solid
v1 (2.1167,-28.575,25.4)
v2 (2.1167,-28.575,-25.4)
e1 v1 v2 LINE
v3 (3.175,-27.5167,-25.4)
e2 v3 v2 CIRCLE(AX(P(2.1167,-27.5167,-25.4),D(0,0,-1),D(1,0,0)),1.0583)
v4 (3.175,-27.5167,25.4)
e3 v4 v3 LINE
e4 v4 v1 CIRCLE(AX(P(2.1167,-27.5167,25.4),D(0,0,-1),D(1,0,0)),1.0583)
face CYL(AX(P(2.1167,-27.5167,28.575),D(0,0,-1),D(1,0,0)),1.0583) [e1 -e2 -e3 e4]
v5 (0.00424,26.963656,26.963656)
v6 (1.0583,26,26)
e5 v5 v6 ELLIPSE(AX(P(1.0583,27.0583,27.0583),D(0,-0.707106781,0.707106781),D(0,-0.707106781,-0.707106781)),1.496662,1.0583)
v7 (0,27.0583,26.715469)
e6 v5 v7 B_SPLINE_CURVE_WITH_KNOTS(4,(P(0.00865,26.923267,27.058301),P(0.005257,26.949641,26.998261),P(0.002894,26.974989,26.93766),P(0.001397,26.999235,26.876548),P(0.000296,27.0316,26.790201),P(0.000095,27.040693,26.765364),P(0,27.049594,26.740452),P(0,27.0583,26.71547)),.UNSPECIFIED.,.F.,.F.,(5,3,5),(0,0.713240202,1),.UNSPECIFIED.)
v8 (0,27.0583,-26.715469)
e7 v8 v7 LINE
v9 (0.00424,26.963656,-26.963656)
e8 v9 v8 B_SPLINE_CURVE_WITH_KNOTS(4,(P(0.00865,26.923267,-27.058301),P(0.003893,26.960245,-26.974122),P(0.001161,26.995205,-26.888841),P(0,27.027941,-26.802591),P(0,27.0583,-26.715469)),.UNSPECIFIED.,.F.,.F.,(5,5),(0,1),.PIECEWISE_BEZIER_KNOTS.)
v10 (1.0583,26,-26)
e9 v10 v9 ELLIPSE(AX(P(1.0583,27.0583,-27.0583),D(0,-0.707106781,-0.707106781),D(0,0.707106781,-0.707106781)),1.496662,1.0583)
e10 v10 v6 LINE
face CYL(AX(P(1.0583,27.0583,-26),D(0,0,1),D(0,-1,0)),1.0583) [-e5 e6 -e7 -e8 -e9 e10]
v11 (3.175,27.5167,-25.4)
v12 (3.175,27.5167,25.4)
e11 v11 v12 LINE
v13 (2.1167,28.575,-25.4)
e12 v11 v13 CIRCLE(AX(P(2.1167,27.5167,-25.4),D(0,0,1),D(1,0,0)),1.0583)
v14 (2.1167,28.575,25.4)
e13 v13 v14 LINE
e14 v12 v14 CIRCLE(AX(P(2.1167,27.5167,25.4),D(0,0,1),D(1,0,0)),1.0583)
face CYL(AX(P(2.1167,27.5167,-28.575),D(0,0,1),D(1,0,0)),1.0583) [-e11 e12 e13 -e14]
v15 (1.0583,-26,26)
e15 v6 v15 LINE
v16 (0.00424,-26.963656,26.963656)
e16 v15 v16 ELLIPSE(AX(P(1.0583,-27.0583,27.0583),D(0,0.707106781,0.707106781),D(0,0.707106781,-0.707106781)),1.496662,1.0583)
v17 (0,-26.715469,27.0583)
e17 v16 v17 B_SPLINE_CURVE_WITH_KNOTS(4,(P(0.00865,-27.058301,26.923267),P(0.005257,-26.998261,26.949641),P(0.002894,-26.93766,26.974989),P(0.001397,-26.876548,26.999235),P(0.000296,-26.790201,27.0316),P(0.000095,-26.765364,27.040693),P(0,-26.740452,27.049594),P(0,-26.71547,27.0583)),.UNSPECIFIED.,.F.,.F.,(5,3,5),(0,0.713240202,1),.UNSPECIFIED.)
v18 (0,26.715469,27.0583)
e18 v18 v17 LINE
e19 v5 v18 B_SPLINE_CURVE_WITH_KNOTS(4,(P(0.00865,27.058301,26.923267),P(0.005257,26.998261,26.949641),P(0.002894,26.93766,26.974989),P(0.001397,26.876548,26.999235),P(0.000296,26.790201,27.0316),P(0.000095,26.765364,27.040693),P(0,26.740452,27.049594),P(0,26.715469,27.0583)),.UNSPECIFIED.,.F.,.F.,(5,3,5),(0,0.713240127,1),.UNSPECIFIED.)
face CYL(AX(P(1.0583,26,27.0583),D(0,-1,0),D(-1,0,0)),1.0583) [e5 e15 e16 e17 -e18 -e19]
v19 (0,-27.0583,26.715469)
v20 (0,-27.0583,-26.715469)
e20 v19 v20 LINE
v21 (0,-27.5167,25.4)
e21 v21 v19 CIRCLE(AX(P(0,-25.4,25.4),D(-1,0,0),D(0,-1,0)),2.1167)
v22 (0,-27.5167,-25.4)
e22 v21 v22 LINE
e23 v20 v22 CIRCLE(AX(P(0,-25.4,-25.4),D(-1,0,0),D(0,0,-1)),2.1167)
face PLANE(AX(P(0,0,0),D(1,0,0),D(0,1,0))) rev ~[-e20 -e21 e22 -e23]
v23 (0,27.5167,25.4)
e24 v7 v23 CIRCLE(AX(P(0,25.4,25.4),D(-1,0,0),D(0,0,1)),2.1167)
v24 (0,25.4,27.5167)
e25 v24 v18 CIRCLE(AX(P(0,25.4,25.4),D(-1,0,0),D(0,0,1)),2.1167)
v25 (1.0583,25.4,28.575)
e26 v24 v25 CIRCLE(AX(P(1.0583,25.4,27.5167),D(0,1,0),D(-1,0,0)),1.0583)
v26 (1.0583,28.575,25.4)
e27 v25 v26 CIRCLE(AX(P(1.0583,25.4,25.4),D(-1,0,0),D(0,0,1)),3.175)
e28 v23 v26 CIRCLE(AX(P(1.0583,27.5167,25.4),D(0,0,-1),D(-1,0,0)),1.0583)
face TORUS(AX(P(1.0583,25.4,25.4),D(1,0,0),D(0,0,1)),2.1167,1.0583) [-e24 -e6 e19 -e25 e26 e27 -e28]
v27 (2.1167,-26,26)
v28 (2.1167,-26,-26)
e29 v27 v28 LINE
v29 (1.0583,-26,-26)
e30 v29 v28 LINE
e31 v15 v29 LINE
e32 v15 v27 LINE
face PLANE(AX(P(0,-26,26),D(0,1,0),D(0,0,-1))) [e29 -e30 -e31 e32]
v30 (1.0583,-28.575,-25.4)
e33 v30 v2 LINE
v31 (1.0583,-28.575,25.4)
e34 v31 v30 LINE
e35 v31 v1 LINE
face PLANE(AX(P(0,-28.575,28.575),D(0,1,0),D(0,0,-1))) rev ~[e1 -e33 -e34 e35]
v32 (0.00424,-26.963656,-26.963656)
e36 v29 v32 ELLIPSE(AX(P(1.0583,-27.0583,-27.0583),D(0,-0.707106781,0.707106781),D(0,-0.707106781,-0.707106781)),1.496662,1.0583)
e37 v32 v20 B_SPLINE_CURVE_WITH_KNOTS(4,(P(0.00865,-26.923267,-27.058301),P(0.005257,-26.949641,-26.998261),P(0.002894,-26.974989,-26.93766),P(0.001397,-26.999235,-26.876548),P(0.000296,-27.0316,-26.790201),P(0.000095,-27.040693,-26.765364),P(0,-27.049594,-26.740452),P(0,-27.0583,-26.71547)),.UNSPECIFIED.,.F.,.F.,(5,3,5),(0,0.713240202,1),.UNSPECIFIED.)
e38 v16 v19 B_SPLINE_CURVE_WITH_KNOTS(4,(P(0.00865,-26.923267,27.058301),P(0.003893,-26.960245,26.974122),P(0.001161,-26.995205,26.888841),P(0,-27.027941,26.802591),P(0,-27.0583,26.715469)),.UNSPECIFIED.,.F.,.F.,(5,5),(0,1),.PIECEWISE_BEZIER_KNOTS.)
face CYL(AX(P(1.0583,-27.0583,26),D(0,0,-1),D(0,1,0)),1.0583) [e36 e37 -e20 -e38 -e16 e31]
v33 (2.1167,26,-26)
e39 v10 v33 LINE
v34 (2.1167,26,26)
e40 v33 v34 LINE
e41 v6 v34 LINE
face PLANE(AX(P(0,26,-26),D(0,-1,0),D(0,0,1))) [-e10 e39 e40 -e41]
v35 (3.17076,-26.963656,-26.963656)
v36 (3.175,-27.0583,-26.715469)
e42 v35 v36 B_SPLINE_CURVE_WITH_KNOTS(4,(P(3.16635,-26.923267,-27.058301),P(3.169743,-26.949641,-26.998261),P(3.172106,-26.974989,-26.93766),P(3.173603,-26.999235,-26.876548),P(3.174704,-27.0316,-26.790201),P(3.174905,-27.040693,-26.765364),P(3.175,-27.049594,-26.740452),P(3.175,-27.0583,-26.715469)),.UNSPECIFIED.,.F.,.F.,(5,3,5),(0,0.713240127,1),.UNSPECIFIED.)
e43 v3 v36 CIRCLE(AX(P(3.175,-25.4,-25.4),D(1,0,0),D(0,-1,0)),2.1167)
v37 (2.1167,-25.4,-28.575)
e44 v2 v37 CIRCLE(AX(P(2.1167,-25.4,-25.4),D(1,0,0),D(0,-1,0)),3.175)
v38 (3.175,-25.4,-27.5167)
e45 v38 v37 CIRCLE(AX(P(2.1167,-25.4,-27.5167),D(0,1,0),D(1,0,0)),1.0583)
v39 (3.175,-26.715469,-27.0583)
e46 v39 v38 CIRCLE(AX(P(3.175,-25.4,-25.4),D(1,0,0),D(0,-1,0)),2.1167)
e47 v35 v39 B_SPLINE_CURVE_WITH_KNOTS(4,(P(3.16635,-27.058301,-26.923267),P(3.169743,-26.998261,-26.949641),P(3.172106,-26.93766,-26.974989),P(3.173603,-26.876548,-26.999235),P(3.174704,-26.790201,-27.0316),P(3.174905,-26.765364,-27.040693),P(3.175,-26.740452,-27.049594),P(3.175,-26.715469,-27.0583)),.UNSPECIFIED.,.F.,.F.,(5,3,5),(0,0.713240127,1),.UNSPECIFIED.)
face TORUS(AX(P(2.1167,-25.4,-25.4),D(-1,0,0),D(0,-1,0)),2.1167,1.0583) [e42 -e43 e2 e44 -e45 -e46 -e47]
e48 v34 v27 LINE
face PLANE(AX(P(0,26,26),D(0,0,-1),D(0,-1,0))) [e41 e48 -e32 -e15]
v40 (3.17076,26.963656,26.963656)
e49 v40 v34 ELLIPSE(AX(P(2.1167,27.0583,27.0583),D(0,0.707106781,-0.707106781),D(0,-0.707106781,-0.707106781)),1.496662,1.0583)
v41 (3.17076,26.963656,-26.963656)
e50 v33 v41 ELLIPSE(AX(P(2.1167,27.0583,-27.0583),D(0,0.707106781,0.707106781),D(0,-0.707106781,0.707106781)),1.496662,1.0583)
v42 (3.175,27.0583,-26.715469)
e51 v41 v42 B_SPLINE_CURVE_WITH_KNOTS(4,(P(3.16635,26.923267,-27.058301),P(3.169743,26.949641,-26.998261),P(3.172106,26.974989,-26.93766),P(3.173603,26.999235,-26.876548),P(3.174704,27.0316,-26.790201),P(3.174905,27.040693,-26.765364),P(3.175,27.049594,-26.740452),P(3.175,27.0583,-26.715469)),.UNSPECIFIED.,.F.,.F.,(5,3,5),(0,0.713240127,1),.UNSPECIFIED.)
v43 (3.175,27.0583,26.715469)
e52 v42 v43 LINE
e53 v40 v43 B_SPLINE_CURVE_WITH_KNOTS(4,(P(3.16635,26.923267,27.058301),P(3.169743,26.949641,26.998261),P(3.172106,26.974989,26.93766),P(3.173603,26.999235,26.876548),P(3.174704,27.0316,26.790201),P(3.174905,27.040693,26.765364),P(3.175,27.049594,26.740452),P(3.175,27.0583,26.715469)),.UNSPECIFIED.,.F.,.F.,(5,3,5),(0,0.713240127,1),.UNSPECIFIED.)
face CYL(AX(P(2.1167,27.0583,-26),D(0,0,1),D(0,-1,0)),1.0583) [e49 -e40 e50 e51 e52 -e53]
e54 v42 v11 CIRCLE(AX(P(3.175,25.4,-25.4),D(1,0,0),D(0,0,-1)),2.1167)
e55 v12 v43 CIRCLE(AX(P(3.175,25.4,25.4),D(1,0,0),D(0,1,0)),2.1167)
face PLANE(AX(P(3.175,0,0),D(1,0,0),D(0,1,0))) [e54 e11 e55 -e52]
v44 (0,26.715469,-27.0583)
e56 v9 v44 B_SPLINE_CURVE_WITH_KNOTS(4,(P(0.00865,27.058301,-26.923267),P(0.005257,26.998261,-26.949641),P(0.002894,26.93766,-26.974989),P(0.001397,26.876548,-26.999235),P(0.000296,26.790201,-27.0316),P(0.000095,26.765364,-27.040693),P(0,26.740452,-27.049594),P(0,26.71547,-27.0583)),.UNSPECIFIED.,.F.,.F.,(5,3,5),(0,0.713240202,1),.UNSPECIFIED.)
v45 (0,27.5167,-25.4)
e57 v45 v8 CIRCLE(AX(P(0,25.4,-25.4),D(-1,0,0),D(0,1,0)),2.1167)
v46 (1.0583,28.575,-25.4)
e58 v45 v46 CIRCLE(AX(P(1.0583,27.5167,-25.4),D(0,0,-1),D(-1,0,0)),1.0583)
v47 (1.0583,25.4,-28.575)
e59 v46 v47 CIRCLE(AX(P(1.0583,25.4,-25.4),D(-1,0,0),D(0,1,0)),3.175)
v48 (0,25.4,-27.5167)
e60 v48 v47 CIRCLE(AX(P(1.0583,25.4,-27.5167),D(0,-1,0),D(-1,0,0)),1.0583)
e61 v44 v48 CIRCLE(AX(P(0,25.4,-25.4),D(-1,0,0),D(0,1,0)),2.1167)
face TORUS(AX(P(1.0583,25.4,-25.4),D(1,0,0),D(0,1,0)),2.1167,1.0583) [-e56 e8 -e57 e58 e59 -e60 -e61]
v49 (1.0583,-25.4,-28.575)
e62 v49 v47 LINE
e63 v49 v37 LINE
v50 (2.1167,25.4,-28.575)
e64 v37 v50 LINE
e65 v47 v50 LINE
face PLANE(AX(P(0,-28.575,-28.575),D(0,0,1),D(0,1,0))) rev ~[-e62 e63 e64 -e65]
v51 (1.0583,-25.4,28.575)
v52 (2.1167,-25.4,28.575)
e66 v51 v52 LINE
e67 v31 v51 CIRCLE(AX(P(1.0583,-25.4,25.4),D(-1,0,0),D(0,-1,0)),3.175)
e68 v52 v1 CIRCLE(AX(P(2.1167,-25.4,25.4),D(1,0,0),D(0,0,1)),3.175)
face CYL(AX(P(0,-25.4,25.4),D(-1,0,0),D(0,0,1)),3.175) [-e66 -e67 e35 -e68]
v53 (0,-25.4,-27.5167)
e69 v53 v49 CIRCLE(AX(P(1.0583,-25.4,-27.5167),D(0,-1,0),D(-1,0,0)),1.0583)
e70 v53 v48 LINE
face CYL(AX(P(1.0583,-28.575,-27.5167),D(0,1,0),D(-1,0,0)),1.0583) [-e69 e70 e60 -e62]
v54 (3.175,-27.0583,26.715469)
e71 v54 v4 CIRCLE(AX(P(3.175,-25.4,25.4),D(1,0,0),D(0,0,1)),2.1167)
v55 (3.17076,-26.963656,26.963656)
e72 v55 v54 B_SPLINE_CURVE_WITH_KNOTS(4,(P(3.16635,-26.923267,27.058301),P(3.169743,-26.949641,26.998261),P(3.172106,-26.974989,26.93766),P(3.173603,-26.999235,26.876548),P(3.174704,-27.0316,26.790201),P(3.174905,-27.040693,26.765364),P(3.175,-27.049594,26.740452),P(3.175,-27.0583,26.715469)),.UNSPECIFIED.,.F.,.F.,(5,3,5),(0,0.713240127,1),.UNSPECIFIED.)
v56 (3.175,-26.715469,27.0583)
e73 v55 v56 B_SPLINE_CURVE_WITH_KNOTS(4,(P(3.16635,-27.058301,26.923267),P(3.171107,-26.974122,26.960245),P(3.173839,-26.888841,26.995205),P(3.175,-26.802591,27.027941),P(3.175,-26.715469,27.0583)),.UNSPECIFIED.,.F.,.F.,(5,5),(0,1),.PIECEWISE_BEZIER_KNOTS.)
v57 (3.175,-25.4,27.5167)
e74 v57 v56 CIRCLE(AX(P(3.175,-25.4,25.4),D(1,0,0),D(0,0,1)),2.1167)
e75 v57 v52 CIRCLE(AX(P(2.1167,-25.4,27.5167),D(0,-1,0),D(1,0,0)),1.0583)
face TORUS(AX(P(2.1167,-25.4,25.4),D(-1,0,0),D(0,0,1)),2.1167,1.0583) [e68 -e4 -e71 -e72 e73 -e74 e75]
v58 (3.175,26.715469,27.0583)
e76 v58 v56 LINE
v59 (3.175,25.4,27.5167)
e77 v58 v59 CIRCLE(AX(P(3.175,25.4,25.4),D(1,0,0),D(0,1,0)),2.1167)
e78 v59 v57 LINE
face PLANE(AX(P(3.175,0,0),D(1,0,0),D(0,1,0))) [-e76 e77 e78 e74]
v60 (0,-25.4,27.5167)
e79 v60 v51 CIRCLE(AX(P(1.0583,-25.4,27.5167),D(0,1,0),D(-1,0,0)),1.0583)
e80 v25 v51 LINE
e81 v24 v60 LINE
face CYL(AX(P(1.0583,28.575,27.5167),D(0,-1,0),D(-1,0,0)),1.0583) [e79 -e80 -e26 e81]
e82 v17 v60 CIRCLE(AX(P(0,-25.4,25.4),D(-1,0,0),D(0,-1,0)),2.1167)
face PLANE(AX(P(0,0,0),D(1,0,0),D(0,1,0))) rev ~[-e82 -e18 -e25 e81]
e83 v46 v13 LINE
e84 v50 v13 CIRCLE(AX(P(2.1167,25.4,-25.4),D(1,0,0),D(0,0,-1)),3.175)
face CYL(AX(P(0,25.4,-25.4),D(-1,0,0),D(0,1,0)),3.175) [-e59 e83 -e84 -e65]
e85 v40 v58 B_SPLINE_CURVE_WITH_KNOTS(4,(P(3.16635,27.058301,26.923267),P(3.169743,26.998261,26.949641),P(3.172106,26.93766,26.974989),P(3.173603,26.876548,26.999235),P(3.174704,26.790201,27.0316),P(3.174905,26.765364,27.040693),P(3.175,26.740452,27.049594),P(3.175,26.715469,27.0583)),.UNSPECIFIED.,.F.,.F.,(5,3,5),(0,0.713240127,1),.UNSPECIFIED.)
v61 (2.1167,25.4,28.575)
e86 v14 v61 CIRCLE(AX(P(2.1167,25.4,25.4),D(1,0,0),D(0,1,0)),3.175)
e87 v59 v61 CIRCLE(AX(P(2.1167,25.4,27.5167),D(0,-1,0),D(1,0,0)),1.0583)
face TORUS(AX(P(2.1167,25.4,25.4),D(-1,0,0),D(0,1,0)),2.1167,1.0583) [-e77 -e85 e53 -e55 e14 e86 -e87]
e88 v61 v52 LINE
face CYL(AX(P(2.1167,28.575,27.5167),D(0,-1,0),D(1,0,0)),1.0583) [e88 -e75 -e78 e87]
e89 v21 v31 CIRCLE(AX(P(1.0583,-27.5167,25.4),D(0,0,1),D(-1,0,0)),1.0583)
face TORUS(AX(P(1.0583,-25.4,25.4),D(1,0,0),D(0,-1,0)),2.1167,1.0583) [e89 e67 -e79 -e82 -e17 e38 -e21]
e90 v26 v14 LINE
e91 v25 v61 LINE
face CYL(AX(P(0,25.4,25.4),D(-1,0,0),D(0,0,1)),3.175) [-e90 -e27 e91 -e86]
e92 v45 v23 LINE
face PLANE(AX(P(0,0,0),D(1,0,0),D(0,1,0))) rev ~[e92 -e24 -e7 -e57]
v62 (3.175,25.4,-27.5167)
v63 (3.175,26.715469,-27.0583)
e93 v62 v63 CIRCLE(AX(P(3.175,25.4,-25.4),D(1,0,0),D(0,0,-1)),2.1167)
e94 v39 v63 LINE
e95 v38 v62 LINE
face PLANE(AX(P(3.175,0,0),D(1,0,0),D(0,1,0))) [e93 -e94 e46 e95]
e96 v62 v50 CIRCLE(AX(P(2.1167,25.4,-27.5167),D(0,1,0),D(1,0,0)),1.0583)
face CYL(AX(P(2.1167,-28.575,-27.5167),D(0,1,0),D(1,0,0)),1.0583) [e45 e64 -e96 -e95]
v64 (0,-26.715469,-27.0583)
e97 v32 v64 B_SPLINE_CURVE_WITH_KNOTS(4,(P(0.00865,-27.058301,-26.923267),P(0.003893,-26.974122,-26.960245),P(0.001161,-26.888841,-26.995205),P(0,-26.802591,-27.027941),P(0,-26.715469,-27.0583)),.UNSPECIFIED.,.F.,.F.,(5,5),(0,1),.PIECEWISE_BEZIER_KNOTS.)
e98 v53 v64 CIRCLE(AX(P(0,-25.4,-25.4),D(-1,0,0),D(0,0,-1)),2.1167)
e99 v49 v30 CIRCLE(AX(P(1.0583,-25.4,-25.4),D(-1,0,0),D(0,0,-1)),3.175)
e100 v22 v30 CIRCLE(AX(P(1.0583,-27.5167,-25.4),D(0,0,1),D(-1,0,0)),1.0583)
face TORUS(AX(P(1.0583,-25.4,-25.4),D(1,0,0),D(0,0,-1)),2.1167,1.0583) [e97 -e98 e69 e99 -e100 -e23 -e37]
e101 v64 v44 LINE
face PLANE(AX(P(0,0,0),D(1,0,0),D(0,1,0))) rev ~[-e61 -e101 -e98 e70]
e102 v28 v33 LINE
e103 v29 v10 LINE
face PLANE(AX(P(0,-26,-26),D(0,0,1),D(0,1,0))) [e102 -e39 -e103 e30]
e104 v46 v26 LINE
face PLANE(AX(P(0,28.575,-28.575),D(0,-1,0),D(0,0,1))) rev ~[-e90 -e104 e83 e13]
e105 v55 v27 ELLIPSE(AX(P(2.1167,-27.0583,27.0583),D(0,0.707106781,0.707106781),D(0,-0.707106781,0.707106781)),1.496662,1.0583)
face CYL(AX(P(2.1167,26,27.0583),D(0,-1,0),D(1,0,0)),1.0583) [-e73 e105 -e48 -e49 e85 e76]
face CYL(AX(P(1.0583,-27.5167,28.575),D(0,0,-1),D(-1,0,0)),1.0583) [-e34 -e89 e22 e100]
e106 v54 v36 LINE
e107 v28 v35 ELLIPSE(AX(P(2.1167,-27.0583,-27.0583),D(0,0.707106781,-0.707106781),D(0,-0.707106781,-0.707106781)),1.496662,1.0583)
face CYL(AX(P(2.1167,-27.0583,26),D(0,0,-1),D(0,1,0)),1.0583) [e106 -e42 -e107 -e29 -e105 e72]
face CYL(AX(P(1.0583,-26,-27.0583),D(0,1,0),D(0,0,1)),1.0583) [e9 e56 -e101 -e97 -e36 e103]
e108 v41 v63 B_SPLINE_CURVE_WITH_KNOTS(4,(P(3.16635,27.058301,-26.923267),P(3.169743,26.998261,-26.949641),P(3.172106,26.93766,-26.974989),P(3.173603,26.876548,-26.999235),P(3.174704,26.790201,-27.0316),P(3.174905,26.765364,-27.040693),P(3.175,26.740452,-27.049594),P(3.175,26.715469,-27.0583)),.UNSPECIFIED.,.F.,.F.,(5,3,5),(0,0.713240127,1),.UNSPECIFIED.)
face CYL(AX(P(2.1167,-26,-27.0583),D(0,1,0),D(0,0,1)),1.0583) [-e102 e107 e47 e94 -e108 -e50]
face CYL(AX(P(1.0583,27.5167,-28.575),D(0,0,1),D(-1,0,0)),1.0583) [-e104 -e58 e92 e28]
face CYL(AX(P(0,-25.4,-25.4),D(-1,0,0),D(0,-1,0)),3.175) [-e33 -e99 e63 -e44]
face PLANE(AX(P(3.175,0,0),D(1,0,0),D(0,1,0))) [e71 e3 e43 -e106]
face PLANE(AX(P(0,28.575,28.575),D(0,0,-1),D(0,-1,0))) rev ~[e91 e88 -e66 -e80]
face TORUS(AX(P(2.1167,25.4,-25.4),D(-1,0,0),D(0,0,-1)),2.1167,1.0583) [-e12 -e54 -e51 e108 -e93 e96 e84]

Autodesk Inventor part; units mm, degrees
ref_plane "YZ Plane" through (0, 0, 0) normal (1, 0, 0) x (0, 1, 0)
ref_plane "XZ Plane" through (0, 0, 0) normal (0, 1, 0) x (-1, 0, 0)
ref_plane "XY Plane" through (0, 0, 0) normal (0, 0, 1) x (1, 0, 0)
sketch "Sketch1" plane through (0, 0, 0) normal (1, 0, 0) x (0, 1, 0)
  line L0 (-26.9875, -26.9875) -> (26.9875, -26.9875)
  line L1 (26.9875, -26.9875) -> (26.9875, 26.9875)
  line L2 (26.9875, 26.9875) -> (-26.9875, 26.9875)
  line L3 (-26.9875, 26.9875) -> (-26.9875, -26.9875)
  line L4 (-26.9875, -26.9875) -> (26.9875, 26.9875) construction
  line L5 (26.9875, -26.9875) -> (-26.9875, 26.9875) construction
  line L6 (-26, -26) -> (26, -26)
  line L7 (26, -26) -> (26, 26)
  line L8 (26, 26) -> (-26, 26)
  line L9 (-26, 26) -> (-26, -26)
  line L10 (-26, -26) -> (26, 26) construction
  line L11 (26, -26) -> (-26, 26) construction
  line L12 (-28.575, -28.575) -> (28.575, -28.575)
  line L13 (28.575, -28.575) -> (28.575, 28.575)
  line L14 (28.575, 28.575) -> (-28.575, 28.575)
  line L15 (-28.575, 28.575) -> (-28.575, -28.575)
  line L16 (-28.575, -28.575) -> (28.575, 28.575) construction
  line L17 (28.575, -28.575) -> (-28.575, 28.575) construction
  point P0 (0, 0)
  dimension "d0" = 53.975
  dimension "d1" = 53.975
  dimension "d2" = 52
  dimension "d3" = 52
  dimension "d4" = 1.5875
  dimension "d5" = 1.5875
extrude "Extrusion1" add sketch "Sketch1" along normal blind 3.175 contours L3 L2 L1 L0 | L15 L14 L13 L12
fillet "Fillet1" radius 1.0583 16 edges at (3.175, 0, 28.575) (3.175, 0, 26) (0, 0, 28.575) (3.175, 28.575, 0) (3.175, 26, 0) (3.175, -26, 0) (0, -26, 0) (3.175, -28.575, 0) (0, -28.575, 0) (3.175, 0, -26) (0, 0, -26) (3.175, 0, -28.575) (0, 28.575, 0) (0, 0, -28.575) (0, 0, 26) (0, 26, 0)
fillet "Fillet2" radius 3.175 12 edges at (2.865, 28.265, 28.265) (0.31, 28.265, 28.265) (1.5875, 28.575, 28.575) (2.865, 28.265, -28.265) (0.31, 28.265, -28.265) (1.5875, 28.575, -28.575) (1.5875, -28.575, -28.575) (0.31, -28.265, -28.265) (2.865, -28.265, -28.265) (2.865, -28.265, 28.265) (0.31, -28.265, 28.265) (1.5875, -28.575, 28.575)
equation "\"d0\" = sensorHolderSensorWidth"
equation "\"d1\" = sensorHolderSensorHeight"
equation "\"d2\" = detectorWidth"
equation "\"d3\" = detectorHeight"
equation "\"d4\" = 0.5 * oRingWidth"
equation "\"d5\" = 0.5 * oRingWidth"
equation "\"d6\" = sensorHolderORing"
equation "\"d8\" = 0.333333 * oRingWidth"
equation "\"d9\" = oRingWidth"
equation "\"acrylicThickness\" = 6.35"
equation "\"height\" = 101.6"
equation "\"width\" = 101.6"
equation "\"depth\" = 101.6"
equation "\"mirrorAngle\" = 5deg"
equation "\"detectorWidth\" = 52"
equation "\"detectorHeight\" = 52"
equation "\"mirrorThickness\" = 3"
equation "\"fresnelThickness\" = 0.1"
equation "\"focalLength\" = 76.2"
equation "\"ior\" = 1.49"
equation "\"centerThickness\" = 1.524"
equation "\"fresnelAngle\" = 90deg"
equation "\"fresnelEffectiveDiameter\" = 76.2"
equation "\"mirrorSuppourtWidth\" = 38.1"
equation "\"backGrooveBit\" = 4.8006"
equation "\"sensorHolderWidth\" = 88.9"
equation "\"sensorHolderHeight\" = 88.9"
equation "\"sensorHolderSensorHeight\" = 53.975"
equation "\"sensorHolderSensorWidth\" = 53.975"
equation "\"sensorHolderORingGroove\" = 3.175"
equation "\"sensorHolderORing\" = 3.175"
equation "\"sensorHolderFlushORing\" = 3.175"
equation "\"sensorHolderFlushORingID\" = 304.8"
equation "\"sensorHolderORingID\" = 203.2"
equation "\"oRingWidth\" = 3.175"
equation "\"frontBackORingID\" = 419.1"
equation "\"topBottomHorizontalMirrorGroove\" = 12.7"
equation "\"backMirrorGroove\" = 6.35"
equation "\"mirrorGroove\" = 19.05"
equation "\"mirrorGrooveFillet\" = 6.35"
equation "\"fresnelChamfer\" = 6.35"
equation "\"mirrorGrooveDrill\" = 6.35"
equation "\"mirrorGrooveMill\" = 3.175"
equation "\"fresnelMirrorChamfer\" = 6.35"
equation "\"detectorOpeningWidth\" = 76.2"
equation "\"detectorOpeningHeight\" = 76.2"
properties part number "sensorORing" material "Rubber"
